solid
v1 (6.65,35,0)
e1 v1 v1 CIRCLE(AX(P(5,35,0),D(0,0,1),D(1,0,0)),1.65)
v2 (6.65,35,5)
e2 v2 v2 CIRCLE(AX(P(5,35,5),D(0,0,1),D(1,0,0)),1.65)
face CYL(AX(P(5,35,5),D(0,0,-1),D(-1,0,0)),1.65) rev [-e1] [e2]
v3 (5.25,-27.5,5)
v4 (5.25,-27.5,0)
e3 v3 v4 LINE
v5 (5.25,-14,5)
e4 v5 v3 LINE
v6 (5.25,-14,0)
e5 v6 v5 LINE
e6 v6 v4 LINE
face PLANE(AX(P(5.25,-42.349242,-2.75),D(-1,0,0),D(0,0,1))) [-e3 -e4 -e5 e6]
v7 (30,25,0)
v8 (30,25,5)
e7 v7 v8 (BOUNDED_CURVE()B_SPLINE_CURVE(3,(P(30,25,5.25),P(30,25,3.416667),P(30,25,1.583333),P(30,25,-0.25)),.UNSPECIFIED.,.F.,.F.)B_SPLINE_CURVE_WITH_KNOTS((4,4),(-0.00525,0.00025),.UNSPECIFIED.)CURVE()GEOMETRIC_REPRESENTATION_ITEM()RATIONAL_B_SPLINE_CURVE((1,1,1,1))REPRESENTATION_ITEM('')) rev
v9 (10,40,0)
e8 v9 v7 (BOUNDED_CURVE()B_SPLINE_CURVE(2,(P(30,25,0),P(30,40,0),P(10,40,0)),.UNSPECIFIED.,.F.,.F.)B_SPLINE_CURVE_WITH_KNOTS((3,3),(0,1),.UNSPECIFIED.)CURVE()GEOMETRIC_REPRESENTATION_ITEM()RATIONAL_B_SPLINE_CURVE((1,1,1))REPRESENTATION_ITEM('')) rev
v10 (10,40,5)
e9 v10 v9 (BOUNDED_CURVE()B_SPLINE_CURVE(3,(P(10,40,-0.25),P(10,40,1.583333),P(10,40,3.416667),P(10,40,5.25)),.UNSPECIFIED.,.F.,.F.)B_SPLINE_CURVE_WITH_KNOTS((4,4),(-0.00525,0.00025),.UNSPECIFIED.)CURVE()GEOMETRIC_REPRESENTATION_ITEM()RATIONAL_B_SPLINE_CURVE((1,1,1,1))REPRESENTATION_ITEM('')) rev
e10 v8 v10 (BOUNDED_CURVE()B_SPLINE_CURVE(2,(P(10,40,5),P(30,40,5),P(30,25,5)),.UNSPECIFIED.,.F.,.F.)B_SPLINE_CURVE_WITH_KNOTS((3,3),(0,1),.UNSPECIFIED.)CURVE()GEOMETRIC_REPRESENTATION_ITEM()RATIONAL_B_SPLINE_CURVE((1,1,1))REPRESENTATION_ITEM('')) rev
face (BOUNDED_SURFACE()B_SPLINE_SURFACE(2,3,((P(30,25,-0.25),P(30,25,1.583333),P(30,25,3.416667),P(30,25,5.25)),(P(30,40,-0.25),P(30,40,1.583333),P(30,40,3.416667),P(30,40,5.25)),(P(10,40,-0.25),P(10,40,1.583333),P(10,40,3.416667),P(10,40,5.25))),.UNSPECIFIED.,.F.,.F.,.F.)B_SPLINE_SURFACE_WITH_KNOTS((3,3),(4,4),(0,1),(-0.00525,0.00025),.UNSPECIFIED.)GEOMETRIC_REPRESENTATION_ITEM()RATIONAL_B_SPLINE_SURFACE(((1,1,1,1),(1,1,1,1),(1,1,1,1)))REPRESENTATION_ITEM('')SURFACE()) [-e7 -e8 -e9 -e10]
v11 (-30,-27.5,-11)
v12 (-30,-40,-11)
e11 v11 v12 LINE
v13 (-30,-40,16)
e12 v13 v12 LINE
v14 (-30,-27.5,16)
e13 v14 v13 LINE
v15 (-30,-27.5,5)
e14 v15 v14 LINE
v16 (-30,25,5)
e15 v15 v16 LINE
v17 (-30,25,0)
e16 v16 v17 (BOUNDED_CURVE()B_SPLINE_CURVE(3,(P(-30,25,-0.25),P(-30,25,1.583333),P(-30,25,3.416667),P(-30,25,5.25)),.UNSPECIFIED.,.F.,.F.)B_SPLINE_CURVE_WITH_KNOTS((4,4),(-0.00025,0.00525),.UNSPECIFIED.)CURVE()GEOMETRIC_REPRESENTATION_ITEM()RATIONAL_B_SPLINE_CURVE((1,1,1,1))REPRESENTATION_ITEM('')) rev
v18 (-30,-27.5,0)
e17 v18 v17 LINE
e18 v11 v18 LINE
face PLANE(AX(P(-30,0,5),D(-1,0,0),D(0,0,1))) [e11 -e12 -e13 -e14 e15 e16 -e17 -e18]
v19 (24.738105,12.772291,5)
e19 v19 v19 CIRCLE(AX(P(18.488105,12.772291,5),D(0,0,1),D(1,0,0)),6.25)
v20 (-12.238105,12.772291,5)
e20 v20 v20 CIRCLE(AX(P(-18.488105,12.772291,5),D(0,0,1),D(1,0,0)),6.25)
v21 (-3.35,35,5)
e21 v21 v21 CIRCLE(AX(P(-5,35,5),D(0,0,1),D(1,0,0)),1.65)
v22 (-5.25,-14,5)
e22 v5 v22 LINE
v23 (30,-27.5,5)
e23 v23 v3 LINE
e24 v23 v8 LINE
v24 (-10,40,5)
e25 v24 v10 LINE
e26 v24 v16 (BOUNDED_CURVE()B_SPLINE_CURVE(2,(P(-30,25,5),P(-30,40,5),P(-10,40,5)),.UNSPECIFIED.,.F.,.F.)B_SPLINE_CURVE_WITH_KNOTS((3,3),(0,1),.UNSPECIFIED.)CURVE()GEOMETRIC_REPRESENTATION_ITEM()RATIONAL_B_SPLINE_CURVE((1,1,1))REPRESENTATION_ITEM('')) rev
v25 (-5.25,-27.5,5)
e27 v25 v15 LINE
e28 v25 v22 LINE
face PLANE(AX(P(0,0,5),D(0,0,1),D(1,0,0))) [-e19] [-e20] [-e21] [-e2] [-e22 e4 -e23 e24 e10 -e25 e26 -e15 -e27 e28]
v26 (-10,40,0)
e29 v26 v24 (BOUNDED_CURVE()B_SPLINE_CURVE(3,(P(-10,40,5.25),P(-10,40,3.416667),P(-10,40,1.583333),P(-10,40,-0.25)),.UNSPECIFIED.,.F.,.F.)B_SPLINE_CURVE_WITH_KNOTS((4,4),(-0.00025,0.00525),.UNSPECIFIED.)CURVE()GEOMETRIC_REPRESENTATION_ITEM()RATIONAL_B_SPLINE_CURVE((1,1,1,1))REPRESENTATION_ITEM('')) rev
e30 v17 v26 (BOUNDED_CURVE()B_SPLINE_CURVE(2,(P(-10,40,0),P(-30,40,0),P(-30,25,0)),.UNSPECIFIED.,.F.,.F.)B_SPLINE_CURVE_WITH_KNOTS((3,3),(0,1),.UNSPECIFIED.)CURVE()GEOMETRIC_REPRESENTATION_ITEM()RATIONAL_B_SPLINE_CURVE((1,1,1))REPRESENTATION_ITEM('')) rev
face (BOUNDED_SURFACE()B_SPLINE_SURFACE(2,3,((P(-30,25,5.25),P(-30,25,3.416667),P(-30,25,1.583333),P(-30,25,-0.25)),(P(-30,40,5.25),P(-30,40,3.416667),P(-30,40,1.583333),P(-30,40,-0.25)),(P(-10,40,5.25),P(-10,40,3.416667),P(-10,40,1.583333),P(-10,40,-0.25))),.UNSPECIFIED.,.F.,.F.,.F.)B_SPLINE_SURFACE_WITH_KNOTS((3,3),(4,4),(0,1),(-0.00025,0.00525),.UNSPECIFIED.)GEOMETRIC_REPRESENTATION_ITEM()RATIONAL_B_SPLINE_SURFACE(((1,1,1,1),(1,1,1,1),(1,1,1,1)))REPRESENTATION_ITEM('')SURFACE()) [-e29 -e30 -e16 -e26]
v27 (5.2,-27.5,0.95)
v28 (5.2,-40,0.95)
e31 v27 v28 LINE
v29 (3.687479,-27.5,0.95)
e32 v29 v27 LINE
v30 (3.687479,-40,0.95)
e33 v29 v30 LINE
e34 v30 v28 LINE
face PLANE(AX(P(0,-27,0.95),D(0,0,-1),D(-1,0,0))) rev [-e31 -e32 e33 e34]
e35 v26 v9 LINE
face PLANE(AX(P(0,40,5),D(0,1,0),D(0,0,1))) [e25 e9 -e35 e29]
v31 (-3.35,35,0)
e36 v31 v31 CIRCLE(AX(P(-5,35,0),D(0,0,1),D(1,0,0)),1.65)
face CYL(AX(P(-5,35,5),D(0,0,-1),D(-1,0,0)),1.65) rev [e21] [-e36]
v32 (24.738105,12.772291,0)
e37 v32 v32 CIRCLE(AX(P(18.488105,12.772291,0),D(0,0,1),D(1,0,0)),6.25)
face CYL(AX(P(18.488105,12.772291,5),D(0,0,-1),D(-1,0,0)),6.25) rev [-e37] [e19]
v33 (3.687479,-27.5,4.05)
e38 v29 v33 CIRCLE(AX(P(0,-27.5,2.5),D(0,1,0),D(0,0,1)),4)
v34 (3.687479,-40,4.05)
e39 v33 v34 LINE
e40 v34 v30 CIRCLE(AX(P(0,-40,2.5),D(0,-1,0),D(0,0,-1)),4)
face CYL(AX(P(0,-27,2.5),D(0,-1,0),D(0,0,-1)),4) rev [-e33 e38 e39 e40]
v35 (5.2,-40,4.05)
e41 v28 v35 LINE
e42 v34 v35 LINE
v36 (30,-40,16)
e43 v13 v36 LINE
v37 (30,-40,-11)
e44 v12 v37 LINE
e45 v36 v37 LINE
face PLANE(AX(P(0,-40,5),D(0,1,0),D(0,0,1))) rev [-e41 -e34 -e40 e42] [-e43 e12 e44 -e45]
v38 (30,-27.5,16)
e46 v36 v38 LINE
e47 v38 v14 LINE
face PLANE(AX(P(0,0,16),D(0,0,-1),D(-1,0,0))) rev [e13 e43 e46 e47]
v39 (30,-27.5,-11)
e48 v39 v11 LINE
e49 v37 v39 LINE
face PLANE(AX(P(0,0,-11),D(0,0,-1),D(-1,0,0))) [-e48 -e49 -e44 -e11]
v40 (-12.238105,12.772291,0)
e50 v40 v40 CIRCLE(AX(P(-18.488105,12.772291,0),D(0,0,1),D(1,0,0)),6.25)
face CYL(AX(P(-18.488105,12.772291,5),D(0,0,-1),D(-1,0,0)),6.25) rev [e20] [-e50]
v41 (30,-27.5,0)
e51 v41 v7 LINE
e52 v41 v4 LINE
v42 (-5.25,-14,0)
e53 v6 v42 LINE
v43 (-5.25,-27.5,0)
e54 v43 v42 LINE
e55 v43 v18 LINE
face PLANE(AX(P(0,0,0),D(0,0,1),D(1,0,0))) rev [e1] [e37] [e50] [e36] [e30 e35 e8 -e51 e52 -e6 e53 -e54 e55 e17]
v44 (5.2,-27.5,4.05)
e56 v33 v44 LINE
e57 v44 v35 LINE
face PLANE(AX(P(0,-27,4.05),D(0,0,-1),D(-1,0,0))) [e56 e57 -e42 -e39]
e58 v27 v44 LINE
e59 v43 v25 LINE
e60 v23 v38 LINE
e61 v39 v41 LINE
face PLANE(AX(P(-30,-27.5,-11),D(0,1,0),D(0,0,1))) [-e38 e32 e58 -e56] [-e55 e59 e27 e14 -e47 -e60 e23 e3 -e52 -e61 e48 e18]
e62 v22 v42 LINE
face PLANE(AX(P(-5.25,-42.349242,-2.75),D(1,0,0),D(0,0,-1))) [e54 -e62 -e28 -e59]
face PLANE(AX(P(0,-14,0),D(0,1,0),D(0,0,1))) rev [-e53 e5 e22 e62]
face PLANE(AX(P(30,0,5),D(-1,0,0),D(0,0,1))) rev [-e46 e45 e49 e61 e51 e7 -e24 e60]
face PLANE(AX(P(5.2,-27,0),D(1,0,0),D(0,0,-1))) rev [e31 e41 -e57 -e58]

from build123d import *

# Parameters (mm, degrees)
SKIZZE1_W                            = 60
SKIZZE1_H                            = 80
SKIZZE1_R                            = 1.65
SKIZZE1_R_2                          = 6.25
AUFSATZ_LINEAR_AUSTRAGEN1_DEPTH      = 5
VERRUNDUNG1_SIZE                     = 15
VERRUNDUNG1_SIZE_2                   = 20
AUFSATZ_LINEAR_AUSTRAGEN2_DEPTH      = 11
AUFSATZ_LINEAR_AUSTRAGEN2_DEPTH_BACK = 16
SKIZZE2_W                            = 60
SKIZZE2_H                            = 12.5
SCHNITT_LINEAR_AUSTRAGEN1_DEPTH      = 13
SCHNITT_LINEAR_AUSTRAGEN2_DEPTH      = 0.5
SCHNITT_LINEAR_AUSTRAGEN2_DEPTH_BACK = 13
SKIZZE4_W                            = 10.5
SKIZZE4_H                            = 10.5


with BuildPart() as part:
    # Skizze1 → Aufsatz-Linear austragen1 (new body)
    with BuildSketch(Plane.XY):
        Rectangle(SKIZZE1_W, SKIZZE1_H)
        with Locations((-5, 35)):
            Circle(SKIZZE1_R, mode=Mode.SUBTRACT)
        with Locations((5, 35)):
            Circle(SKIZZE1_R, mode=Mode.SUBTRACT)
        with Locations((-18.488104712, 12.772291363)):
            Circle(SKIZZE1_R_2, mode=Mode.SUBTRACT)
        with Locations((18.488104712, 12.772291363)):
            Circle(SKIZZE1_R_2, mode=Mode.SUBTRACT)
    extrude(amount=AUFSATZ_LINEAR_AUSTRAGEN1_DEPTH)

    # Verrundung1
    # a fillet whose section is not a circle: 20, 15 mm, written as the material it takes off along each edge
    with BuildSketch(Plane(origin=(30, 40, -50), x_dir=(0, -1, 0), z_dir=(0, 0, 1))) as verrundung1_piece_1:
        with BuildLine():
            Bezier((VERRUNDUNG1_SIZE, 0), (0, 0), (0, -VERRUNDUNG1_SIZE_2), weights=[1, 1, 1])
            Line((0, -VERRUNDUNG1_SIZE_2), (0, 0))
            Line((0, 0), (VERRUNDUNG1_SIZE, 0))
        make_face()
    extrude(amount=105, mode=Mode.SUBTRACT)
    with BuildSketch(Plane(origin=(-30, 40, -50), x_dir=(1, 0, 0), z_dir=(0, 0, 1))) as verrundung1_piece_2:
        with BuildLine():
            Bezier((VERRUNDUNG1_SIZE_2, 0), (0, 0), (0, -VERRUNDUNG1_SIZE), weights=[1, 1, 1])
            Line((0, -VERRUNDUNG1_SIZE), (0, 0))
            Line((0, 0), (VERRUNDUNG1_SIZE_2, 0))
        make_face()
    extrude(amount=105, mode=Mode.SUBTRACT)

    # Skizze2 → Aufsatz-Linear austragen2 (add, two sides: drawn at the far end of the back side and taken through both)
    with BuildSketch(Plane.XY.offset(5).offset(-AUFSATZ_LINEAR_AUSTRAGEN2_DEPTH_BACK)):
        with Locations((0, -33.75)):
            Rectangle(SKIZZE2_W, SKIZZE2_H)
    extrude(amount=AUFSATZ_LINEAR_AUSTRAGEN2_DEPTH + AUFSATZ_LINEAR_AUSTRAGEN2_DEPTH_BACK)

    # Skizze3 → Schnitt-Linear austragen1 (cut)
    with BuildSketch(Plane.XZ.offset(40)):
        with BuildLine():
            Line((2.8, 4.05), (2.8, 0.95))
            Line((2.8, 0.95), (3.687478813, 0.95))
            ThreePointArc((3.687478813, 0.95), (3.921091382, 1.709403786), (4, 2.5))
            ThreePointArc((4, 2.5), (3.921091382, 3.290596214), (3.687478813, 4.05))
            Line((3.687478813, 4.05), (2.8, 4.05))
        make_face()
        with BuildLine():
            Line((3.687478813, 0.95), (2.8, 0.95))
            Line((2.8, 0.95), (2.8, 4.05))
            Line((2.8, 4.05), (3.687478813, 4.05))
            ThreePointArc((3.687478813, 4.05), (-4, 2.5), (3.687478813, 0.95))
        make_face()
        with BuildLine():
            ThreePointArc((4, 2.5), (3.921091382, 1.709403786), (3.687478813, 0.95))
            Line((3.687478813, 0.95), (5.2, 0.95))
            Line((5.2, 0.95), (5.2, 4.05))
            Line((5.2, 4.05), (3.687478813, 4.05))
            ThreePointArc((3.687478813, 4.05), (3.921091382, 3.290596214), (4, 2.5))
        make_face()
    extrude(amount=-SCHNITT_LINEAR_AUSTRAGEN1_DEPTH, mode=Mode.SUBTRACT)

    # Skizze4 → Schnitt-Linear austragen2 (cut, two sides: drawn at the far end of the back side and taken through both)
    with BuildSketch(Plane.XZ.offset(27).offset(-SCHNITT_LINEAR_AUSTRAGEN2_DEPTH_BACK)):
        with Locations((0, 2.5)):
            Rectangle(SKIZZE4_W, SKIZZE4_H)
    extrude(amount=SCHNITT_LINEAR_AUSTRAGEN2_DEPTH + SCHNITT_LINEAR_AUSTRAGEN2_DEPTH_BACK, mode=Mode.SUBTRACT)


solid = part.part
